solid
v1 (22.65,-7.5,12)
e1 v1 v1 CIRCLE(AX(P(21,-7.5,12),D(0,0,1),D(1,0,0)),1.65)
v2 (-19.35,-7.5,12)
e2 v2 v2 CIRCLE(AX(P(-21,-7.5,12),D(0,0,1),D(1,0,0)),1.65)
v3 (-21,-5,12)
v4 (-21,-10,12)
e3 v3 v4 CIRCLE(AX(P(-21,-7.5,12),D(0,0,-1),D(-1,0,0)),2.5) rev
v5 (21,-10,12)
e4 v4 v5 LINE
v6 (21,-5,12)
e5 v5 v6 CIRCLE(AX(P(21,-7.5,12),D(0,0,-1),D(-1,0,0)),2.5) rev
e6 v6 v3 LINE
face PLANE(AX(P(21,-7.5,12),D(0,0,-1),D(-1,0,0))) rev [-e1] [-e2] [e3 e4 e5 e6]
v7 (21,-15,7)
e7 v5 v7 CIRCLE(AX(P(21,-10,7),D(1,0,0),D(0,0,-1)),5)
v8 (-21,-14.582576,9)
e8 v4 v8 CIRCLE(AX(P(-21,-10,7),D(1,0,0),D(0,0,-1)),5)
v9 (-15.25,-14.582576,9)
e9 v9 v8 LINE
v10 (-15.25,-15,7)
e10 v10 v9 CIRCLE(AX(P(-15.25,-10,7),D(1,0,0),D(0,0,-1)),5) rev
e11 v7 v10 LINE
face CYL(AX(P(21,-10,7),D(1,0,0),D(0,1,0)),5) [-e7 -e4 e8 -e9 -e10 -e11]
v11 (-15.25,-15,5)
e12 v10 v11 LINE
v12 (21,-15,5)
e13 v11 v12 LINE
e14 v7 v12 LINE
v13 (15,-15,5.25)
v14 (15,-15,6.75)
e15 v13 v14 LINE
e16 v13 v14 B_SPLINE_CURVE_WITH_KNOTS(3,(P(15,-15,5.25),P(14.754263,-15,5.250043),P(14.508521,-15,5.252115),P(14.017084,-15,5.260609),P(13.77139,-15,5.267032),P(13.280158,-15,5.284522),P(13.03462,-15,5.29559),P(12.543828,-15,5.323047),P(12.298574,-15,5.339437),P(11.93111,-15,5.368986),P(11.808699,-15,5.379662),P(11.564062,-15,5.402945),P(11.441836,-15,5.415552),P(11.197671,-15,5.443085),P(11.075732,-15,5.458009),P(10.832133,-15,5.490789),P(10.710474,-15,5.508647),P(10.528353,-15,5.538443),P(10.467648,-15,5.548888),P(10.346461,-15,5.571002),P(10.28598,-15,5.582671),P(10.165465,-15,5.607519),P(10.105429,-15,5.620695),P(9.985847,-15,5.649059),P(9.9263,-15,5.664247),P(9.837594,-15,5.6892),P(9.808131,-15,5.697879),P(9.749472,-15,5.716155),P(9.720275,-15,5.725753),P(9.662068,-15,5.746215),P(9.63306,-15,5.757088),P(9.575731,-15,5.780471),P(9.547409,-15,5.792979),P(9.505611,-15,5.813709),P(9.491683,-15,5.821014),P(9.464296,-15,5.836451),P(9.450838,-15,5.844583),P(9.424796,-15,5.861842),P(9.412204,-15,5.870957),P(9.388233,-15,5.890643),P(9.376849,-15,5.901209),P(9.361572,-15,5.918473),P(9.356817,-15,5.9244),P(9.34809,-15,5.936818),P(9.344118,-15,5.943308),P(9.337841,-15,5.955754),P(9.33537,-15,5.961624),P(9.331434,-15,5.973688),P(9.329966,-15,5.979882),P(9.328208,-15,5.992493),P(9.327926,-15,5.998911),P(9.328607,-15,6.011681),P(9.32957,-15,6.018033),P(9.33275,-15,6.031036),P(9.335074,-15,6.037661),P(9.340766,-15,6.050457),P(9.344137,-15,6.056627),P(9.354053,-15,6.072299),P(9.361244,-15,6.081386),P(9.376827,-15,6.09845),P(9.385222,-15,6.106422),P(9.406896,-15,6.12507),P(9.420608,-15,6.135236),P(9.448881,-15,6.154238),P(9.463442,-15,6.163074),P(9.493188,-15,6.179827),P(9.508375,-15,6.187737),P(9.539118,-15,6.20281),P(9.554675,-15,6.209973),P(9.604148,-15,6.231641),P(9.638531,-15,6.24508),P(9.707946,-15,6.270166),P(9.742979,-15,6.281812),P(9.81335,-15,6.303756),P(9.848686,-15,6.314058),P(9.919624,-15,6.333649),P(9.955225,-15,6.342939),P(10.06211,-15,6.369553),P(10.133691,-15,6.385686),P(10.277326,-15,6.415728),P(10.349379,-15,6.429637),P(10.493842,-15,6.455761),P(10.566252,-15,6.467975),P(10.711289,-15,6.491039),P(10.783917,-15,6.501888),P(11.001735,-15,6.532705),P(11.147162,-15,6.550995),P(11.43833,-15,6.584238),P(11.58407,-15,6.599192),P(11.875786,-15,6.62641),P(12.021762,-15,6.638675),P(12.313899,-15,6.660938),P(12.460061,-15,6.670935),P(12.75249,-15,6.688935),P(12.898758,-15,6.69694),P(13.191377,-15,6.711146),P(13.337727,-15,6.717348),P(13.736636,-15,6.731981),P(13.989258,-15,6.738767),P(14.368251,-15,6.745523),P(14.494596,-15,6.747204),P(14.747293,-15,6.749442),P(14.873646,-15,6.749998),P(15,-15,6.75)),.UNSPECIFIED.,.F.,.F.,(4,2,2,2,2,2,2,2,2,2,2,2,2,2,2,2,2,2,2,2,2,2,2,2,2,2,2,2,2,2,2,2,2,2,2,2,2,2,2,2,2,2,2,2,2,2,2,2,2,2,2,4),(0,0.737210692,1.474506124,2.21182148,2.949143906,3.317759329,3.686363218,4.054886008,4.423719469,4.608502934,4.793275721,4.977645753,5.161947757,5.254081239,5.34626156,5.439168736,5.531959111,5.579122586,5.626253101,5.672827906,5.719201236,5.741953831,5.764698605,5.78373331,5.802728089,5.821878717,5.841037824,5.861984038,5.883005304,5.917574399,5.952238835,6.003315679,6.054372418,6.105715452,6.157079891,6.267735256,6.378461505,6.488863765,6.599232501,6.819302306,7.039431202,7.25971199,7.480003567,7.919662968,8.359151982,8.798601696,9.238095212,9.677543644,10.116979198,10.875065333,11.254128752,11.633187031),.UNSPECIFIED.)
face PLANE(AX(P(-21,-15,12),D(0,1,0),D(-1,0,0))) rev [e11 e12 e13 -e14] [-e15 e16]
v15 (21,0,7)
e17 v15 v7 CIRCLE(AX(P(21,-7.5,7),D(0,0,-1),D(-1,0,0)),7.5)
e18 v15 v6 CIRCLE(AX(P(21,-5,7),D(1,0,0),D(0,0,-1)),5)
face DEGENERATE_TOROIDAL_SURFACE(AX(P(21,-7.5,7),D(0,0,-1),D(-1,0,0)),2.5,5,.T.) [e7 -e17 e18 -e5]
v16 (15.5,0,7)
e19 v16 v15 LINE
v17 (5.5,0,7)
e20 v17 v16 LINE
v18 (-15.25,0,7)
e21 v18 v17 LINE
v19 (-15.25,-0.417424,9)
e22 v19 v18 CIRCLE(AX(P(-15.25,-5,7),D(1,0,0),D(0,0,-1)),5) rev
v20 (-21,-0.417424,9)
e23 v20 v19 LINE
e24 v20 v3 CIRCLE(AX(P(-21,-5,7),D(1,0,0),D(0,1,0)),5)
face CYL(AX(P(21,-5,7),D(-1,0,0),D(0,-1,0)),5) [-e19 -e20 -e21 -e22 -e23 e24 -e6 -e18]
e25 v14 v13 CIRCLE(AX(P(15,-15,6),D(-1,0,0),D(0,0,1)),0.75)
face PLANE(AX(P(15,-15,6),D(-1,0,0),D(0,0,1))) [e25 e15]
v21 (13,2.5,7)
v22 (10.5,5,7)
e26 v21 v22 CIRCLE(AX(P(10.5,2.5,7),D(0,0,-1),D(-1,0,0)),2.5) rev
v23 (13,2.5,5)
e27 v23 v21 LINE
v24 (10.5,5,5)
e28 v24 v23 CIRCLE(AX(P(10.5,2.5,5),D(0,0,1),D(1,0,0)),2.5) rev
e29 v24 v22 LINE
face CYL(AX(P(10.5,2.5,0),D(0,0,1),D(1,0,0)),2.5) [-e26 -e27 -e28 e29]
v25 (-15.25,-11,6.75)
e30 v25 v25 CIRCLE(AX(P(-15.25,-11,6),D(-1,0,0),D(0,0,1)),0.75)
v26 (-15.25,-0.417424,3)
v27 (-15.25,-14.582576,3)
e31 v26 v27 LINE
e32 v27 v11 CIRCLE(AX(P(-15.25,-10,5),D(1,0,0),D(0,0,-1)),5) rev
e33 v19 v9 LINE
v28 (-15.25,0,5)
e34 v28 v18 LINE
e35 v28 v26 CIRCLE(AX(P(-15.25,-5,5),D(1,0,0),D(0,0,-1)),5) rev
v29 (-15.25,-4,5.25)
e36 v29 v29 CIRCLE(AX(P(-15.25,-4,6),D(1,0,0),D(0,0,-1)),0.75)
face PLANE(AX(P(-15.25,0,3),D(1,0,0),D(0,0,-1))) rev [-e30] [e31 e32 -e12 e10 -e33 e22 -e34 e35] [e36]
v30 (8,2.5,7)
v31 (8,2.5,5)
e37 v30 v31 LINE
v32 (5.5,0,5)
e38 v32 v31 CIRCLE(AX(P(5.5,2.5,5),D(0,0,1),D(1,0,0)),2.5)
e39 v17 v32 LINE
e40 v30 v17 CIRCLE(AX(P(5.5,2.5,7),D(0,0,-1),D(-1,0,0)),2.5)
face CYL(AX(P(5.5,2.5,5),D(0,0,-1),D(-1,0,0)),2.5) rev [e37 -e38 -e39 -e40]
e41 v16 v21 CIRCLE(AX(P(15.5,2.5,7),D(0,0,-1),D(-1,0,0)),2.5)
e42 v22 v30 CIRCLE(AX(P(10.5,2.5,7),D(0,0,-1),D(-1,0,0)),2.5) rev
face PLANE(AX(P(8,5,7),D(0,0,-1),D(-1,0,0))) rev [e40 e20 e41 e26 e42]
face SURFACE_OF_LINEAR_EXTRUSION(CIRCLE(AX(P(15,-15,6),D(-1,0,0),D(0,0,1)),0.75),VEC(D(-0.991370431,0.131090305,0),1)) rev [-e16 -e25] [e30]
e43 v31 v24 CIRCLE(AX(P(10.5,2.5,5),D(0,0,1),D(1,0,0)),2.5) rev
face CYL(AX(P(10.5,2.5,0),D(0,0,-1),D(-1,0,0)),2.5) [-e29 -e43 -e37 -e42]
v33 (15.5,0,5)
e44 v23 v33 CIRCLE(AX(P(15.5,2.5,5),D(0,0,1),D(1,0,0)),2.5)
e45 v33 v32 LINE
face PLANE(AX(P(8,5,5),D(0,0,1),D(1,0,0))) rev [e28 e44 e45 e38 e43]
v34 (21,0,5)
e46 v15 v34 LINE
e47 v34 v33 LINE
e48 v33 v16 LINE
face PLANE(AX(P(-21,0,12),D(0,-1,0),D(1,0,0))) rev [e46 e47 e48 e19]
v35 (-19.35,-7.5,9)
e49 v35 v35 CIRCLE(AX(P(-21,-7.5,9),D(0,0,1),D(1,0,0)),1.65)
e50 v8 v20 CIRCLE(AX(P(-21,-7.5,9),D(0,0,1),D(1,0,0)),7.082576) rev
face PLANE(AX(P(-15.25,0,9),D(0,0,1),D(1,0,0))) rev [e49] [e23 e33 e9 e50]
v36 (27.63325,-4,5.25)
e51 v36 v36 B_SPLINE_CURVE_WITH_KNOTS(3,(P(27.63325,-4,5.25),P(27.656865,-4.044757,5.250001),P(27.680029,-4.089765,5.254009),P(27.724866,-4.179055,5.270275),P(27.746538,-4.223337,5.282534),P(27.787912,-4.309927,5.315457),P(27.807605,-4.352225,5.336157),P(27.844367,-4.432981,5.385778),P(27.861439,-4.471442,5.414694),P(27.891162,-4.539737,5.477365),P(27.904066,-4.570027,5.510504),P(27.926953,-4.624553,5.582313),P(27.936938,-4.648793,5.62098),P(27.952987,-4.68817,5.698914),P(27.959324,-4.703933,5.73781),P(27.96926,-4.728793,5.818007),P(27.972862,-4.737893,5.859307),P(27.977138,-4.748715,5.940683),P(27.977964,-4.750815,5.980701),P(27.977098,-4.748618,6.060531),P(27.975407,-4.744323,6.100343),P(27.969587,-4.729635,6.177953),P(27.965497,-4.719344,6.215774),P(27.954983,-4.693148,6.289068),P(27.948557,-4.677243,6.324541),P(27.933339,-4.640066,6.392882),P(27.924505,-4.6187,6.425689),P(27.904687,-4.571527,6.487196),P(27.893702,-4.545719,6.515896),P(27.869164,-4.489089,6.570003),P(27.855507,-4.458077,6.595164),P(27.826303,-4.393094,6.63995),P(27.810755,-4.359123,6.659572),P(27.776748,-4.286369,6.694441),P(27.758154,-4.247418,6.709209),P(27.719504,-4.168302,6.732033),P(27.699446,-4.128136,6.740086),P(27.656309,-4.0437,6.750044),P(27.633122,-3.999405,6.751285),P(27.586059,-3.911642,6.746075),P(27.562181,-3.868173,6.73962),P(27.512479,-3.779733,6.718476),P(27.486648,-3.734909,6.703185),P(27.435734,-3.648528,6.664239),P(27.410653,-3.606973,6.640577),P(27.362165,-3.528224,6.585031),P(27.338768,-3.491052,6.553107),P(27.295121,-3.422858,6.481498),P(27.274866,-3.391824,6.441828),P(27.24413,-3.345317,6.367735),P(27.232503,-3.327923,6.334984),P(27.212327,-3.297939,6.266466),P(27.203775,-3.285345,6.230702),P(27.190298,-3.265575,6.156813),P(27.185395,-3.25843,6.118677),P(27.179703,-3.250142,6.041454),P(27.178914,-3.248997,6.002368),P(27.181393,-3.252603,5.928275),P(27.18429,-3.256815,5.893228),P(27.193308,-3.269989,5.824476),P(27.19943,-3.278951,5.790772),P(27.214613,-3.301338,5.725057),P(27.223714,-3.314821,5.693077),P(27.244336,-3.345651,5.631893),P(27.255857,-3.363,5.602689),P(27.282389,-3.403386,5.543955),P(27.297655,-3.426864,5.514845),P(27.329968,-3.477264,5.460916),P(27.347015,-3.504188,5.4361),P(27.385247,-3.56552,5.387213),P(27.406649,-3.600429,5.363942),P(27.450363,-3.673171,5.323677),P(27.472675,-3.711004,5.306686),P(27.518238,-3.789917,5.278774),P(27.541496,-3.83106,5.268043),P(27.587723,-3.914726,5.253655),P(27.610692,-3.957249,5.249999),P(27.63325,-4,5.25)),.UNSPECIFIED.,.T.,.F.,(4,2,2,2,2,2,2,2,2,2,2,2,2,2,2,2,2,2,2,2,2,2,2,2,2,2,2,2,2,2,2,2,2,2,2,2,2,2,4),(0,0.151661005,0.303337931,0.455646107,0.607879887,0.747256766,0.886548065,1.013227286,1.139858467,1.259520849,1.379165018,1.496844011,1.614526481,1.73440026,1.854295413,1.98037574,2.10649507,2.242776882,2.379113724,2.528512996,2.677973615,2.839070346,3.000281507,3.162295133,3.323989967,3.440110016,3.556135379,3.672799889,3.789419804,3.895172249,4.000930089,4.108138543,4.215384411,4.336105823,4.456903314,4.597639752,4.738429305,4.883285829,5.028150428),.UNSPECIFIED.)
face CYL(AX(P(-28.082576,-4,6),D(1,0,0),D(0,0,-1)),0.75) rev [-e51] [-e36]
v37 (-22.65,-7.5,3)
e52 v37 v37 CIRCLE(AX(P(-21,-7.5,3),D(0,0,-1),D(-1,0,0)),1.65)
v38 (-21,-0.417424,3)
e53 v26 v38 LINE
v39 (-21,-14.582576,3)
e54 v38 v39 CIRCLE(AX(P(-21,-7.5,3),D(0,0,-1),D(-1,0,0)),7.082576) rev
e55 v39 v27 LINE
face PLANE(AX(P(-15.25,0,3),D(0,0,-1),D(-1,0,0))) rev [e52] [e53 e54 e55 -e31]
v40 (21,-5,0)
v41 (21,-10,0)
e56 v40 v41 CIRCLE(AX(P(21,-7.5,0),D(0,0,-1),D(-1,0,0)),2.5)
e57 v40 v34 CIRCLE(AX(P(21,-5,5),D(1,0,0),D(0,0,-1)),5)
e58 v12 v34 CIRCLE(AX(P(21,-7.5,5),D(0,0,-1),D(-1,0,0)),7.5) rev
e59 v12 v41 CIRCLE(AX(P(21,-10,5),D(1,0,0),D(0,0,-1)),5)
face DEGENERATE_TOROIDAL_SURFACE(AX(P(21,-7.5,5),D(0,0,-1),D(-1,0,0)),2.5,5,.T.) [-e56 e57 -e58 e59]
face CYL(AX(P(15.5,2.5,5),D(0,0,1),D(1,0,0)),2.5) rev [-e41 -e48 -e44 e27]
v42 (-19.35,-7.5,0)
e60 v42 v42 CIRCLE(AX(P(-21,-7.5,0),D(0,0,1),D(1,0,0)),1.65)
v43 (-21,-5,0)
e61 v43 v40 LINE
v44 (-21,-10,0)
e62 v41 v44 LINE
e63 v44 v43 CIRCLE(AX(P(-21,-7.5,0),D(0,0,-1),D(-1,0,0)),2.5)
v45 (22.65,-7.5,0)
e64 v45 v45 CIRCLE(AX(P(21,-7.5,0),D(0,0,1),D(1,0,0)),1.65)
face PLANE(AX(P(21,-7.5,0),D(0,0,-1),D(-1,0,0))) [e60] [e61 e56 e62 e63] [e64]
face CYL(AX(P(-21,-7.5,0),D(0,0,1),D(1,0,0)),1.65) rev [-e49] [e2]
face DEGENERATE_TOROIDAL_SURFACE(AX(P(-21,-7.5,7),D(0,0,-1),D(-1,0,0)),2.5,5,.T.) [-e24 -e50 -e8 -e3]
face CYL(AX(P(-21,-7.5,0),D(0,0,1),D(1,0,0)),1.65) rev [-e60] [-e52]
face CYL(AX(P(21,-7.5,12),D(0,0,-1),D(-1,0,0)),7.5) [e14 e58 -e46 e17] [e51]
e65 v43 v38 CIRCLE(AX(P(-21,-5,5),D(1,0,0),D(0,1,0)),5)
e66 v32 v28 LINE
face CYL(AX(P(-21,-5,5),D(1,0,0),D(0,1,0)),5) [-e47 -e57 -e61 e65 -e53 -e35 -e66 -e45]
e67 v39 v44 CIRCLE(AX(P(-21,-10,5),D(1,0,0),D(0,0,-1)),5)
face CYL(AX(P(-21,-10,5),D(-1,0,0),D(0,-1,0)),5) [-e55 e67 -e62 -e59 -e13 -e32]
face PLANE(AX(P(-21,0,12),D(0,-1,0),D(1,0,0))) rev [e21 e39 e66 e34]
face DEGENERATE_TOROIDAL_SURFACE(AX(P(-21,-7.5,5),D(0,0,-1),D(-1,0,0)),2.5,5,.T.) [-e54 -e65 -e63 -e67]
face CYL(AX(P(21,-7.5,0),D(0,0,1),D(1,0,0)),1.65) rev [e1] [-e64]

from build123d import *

# Parameters (mm, degrees)
BOSS_EXTRUDE1_DEPTH = 12
FILLET1_R           = 5
SKETCH5_W           = 13.25
SKETCH5_H           = 6
CUT_EXTRUDE3_DEPTH  = 40.764934301
SKETCH6_W           = 5
SKETCH6_H           = 2
BOSS_EXTRUDE2_DEPTH = 5
FILLET2_R           = 2.5
FILLET3_R           = 2.5
SKETCH3_R           = 1.65
CUT_EXTRUDE4_DEPTH  = 35.369317791
SKETCH8_R           = 0.75
CUT_EXTRUDE7_DEPTH  = 60.754396399
SKETCH9_R           = 0.75
CUT_EXTRUDE9_DEPTH  = 30.513316765


with BuildPart() as part:
    # Sketch2 → Boss-Extrude1 (new body)
    with BuildSketch(Plane.XY):
        with BuildLine():
            Line((-21, 0), (21, 0))
            ThreePointArc((21, 0), (28.5, -7.5), (21, -15))
            Line((21, -15), (-21, -15))
            ThreePointArc((-21, -15), (-28.5, -7.5), (-21, 0))
        make_face()
    extrude(amount=BOSS_EXTRUDE1_DEPTH)

    # Fillet1
    fillet1_edges = [part.edges().sort_by_distance(p)[0] for p in [
        (-28.5, -7.5, 12),
        (0, -15, 12),
        (28.5, -7.5, 12),
        (0, -15, 0),
        (-28.5, -7.5, 0),
        (0, 0, 0),
        (28.5, -7.5, 0),
        (0, 0, 12),
    ]]
    fillet(fillet1_edges, radius=FILLET1_R)

    # Sketch5 → Cut-Extrude3 (cut, through all)
    with BuildSketch(Plane(origin=(0, -25, 0), x_dir=(-1, 0, 0), z_dir=(0, -1, 0))):
        with Locations((21.875, -6)):
            Rectangle(SKETCH5_W, SKETCH5_H)
    extrude(amount=-CUT_EXTRUDE3_DEPTH, mode=Mode.SUBTRACT)

    # Sketch6 → Boss-Extrude2 (add)
    with BuildSketch(Plane(origin=(0, 0, 0), x_dir=(1, 0, 0), z_dir=(0, 1, 0))):
        with Locations((10.5, -6)):
            Rectangle(SKETCH6_W, SKETCH6_H)
    extrude(amount=BOSS_EXTRUDE2_DEPTH)

    # Fillet2
    fillet2_edges = [part.edges().sort_by_distance(p)[0] for p in [
        (13, 5, 6),
        (8, 5, 6),
    ]]
    fillet(fillet2_edges, radius=FILLET2_R - 0.0001)  # a hair under: the kernel refuses the full size

    # Fillet3
    fillet3_edges = [part.edges().sort_by_distance(p)[0] for p in [
        (8, 0, 6),
        (13, 0, 6),
    ]]
    fillet(fillet3_edges, radius=FILLET3_R)

    # Sketch3 → Cut-Extrude4 (cut, through all)
    with BuildSketch(Plane.XY.offset(12)):
        with Locations((-21, -7.5)):
            Circle(SKETCH3_R)
        with Locations((21, -7.5)):
            Circle(SKETCH3_R)
    extrude(amount=-CUT_EXTRUDE4_DEPTH, mode=Mode.SUBTRACT)

    # Sketch8 → Cut-Extrude7 (cut, through all)
    with BuildSketch(Plane(origin=(28.5, 0, 0), x_dir=(0, 0, -1), z_dir=(1, 0, 0))):
        with Locations((-6, -4)):
            Circle(SKETCH8_R)
    extrude(amount=-CUT_EXTRUDE7_DEPTH, mode=Mode.SUBTRACT)

    # Sketch9 → Cut-Extrude9 (cut, along a direction that is not the sketch's normal)
    with BuildSketch(Plane.ZY.offset(15.25)):
        with Locations((6, -11)):
            Circle(SKETCH9_R)
    extrude(amount=-CUT_EXTRUDE9_DEPTH, dir=(-0.9913704312445624, 0.1310903049579585, 0), mode=Mode.SUBTRACT)


solid = part.part
